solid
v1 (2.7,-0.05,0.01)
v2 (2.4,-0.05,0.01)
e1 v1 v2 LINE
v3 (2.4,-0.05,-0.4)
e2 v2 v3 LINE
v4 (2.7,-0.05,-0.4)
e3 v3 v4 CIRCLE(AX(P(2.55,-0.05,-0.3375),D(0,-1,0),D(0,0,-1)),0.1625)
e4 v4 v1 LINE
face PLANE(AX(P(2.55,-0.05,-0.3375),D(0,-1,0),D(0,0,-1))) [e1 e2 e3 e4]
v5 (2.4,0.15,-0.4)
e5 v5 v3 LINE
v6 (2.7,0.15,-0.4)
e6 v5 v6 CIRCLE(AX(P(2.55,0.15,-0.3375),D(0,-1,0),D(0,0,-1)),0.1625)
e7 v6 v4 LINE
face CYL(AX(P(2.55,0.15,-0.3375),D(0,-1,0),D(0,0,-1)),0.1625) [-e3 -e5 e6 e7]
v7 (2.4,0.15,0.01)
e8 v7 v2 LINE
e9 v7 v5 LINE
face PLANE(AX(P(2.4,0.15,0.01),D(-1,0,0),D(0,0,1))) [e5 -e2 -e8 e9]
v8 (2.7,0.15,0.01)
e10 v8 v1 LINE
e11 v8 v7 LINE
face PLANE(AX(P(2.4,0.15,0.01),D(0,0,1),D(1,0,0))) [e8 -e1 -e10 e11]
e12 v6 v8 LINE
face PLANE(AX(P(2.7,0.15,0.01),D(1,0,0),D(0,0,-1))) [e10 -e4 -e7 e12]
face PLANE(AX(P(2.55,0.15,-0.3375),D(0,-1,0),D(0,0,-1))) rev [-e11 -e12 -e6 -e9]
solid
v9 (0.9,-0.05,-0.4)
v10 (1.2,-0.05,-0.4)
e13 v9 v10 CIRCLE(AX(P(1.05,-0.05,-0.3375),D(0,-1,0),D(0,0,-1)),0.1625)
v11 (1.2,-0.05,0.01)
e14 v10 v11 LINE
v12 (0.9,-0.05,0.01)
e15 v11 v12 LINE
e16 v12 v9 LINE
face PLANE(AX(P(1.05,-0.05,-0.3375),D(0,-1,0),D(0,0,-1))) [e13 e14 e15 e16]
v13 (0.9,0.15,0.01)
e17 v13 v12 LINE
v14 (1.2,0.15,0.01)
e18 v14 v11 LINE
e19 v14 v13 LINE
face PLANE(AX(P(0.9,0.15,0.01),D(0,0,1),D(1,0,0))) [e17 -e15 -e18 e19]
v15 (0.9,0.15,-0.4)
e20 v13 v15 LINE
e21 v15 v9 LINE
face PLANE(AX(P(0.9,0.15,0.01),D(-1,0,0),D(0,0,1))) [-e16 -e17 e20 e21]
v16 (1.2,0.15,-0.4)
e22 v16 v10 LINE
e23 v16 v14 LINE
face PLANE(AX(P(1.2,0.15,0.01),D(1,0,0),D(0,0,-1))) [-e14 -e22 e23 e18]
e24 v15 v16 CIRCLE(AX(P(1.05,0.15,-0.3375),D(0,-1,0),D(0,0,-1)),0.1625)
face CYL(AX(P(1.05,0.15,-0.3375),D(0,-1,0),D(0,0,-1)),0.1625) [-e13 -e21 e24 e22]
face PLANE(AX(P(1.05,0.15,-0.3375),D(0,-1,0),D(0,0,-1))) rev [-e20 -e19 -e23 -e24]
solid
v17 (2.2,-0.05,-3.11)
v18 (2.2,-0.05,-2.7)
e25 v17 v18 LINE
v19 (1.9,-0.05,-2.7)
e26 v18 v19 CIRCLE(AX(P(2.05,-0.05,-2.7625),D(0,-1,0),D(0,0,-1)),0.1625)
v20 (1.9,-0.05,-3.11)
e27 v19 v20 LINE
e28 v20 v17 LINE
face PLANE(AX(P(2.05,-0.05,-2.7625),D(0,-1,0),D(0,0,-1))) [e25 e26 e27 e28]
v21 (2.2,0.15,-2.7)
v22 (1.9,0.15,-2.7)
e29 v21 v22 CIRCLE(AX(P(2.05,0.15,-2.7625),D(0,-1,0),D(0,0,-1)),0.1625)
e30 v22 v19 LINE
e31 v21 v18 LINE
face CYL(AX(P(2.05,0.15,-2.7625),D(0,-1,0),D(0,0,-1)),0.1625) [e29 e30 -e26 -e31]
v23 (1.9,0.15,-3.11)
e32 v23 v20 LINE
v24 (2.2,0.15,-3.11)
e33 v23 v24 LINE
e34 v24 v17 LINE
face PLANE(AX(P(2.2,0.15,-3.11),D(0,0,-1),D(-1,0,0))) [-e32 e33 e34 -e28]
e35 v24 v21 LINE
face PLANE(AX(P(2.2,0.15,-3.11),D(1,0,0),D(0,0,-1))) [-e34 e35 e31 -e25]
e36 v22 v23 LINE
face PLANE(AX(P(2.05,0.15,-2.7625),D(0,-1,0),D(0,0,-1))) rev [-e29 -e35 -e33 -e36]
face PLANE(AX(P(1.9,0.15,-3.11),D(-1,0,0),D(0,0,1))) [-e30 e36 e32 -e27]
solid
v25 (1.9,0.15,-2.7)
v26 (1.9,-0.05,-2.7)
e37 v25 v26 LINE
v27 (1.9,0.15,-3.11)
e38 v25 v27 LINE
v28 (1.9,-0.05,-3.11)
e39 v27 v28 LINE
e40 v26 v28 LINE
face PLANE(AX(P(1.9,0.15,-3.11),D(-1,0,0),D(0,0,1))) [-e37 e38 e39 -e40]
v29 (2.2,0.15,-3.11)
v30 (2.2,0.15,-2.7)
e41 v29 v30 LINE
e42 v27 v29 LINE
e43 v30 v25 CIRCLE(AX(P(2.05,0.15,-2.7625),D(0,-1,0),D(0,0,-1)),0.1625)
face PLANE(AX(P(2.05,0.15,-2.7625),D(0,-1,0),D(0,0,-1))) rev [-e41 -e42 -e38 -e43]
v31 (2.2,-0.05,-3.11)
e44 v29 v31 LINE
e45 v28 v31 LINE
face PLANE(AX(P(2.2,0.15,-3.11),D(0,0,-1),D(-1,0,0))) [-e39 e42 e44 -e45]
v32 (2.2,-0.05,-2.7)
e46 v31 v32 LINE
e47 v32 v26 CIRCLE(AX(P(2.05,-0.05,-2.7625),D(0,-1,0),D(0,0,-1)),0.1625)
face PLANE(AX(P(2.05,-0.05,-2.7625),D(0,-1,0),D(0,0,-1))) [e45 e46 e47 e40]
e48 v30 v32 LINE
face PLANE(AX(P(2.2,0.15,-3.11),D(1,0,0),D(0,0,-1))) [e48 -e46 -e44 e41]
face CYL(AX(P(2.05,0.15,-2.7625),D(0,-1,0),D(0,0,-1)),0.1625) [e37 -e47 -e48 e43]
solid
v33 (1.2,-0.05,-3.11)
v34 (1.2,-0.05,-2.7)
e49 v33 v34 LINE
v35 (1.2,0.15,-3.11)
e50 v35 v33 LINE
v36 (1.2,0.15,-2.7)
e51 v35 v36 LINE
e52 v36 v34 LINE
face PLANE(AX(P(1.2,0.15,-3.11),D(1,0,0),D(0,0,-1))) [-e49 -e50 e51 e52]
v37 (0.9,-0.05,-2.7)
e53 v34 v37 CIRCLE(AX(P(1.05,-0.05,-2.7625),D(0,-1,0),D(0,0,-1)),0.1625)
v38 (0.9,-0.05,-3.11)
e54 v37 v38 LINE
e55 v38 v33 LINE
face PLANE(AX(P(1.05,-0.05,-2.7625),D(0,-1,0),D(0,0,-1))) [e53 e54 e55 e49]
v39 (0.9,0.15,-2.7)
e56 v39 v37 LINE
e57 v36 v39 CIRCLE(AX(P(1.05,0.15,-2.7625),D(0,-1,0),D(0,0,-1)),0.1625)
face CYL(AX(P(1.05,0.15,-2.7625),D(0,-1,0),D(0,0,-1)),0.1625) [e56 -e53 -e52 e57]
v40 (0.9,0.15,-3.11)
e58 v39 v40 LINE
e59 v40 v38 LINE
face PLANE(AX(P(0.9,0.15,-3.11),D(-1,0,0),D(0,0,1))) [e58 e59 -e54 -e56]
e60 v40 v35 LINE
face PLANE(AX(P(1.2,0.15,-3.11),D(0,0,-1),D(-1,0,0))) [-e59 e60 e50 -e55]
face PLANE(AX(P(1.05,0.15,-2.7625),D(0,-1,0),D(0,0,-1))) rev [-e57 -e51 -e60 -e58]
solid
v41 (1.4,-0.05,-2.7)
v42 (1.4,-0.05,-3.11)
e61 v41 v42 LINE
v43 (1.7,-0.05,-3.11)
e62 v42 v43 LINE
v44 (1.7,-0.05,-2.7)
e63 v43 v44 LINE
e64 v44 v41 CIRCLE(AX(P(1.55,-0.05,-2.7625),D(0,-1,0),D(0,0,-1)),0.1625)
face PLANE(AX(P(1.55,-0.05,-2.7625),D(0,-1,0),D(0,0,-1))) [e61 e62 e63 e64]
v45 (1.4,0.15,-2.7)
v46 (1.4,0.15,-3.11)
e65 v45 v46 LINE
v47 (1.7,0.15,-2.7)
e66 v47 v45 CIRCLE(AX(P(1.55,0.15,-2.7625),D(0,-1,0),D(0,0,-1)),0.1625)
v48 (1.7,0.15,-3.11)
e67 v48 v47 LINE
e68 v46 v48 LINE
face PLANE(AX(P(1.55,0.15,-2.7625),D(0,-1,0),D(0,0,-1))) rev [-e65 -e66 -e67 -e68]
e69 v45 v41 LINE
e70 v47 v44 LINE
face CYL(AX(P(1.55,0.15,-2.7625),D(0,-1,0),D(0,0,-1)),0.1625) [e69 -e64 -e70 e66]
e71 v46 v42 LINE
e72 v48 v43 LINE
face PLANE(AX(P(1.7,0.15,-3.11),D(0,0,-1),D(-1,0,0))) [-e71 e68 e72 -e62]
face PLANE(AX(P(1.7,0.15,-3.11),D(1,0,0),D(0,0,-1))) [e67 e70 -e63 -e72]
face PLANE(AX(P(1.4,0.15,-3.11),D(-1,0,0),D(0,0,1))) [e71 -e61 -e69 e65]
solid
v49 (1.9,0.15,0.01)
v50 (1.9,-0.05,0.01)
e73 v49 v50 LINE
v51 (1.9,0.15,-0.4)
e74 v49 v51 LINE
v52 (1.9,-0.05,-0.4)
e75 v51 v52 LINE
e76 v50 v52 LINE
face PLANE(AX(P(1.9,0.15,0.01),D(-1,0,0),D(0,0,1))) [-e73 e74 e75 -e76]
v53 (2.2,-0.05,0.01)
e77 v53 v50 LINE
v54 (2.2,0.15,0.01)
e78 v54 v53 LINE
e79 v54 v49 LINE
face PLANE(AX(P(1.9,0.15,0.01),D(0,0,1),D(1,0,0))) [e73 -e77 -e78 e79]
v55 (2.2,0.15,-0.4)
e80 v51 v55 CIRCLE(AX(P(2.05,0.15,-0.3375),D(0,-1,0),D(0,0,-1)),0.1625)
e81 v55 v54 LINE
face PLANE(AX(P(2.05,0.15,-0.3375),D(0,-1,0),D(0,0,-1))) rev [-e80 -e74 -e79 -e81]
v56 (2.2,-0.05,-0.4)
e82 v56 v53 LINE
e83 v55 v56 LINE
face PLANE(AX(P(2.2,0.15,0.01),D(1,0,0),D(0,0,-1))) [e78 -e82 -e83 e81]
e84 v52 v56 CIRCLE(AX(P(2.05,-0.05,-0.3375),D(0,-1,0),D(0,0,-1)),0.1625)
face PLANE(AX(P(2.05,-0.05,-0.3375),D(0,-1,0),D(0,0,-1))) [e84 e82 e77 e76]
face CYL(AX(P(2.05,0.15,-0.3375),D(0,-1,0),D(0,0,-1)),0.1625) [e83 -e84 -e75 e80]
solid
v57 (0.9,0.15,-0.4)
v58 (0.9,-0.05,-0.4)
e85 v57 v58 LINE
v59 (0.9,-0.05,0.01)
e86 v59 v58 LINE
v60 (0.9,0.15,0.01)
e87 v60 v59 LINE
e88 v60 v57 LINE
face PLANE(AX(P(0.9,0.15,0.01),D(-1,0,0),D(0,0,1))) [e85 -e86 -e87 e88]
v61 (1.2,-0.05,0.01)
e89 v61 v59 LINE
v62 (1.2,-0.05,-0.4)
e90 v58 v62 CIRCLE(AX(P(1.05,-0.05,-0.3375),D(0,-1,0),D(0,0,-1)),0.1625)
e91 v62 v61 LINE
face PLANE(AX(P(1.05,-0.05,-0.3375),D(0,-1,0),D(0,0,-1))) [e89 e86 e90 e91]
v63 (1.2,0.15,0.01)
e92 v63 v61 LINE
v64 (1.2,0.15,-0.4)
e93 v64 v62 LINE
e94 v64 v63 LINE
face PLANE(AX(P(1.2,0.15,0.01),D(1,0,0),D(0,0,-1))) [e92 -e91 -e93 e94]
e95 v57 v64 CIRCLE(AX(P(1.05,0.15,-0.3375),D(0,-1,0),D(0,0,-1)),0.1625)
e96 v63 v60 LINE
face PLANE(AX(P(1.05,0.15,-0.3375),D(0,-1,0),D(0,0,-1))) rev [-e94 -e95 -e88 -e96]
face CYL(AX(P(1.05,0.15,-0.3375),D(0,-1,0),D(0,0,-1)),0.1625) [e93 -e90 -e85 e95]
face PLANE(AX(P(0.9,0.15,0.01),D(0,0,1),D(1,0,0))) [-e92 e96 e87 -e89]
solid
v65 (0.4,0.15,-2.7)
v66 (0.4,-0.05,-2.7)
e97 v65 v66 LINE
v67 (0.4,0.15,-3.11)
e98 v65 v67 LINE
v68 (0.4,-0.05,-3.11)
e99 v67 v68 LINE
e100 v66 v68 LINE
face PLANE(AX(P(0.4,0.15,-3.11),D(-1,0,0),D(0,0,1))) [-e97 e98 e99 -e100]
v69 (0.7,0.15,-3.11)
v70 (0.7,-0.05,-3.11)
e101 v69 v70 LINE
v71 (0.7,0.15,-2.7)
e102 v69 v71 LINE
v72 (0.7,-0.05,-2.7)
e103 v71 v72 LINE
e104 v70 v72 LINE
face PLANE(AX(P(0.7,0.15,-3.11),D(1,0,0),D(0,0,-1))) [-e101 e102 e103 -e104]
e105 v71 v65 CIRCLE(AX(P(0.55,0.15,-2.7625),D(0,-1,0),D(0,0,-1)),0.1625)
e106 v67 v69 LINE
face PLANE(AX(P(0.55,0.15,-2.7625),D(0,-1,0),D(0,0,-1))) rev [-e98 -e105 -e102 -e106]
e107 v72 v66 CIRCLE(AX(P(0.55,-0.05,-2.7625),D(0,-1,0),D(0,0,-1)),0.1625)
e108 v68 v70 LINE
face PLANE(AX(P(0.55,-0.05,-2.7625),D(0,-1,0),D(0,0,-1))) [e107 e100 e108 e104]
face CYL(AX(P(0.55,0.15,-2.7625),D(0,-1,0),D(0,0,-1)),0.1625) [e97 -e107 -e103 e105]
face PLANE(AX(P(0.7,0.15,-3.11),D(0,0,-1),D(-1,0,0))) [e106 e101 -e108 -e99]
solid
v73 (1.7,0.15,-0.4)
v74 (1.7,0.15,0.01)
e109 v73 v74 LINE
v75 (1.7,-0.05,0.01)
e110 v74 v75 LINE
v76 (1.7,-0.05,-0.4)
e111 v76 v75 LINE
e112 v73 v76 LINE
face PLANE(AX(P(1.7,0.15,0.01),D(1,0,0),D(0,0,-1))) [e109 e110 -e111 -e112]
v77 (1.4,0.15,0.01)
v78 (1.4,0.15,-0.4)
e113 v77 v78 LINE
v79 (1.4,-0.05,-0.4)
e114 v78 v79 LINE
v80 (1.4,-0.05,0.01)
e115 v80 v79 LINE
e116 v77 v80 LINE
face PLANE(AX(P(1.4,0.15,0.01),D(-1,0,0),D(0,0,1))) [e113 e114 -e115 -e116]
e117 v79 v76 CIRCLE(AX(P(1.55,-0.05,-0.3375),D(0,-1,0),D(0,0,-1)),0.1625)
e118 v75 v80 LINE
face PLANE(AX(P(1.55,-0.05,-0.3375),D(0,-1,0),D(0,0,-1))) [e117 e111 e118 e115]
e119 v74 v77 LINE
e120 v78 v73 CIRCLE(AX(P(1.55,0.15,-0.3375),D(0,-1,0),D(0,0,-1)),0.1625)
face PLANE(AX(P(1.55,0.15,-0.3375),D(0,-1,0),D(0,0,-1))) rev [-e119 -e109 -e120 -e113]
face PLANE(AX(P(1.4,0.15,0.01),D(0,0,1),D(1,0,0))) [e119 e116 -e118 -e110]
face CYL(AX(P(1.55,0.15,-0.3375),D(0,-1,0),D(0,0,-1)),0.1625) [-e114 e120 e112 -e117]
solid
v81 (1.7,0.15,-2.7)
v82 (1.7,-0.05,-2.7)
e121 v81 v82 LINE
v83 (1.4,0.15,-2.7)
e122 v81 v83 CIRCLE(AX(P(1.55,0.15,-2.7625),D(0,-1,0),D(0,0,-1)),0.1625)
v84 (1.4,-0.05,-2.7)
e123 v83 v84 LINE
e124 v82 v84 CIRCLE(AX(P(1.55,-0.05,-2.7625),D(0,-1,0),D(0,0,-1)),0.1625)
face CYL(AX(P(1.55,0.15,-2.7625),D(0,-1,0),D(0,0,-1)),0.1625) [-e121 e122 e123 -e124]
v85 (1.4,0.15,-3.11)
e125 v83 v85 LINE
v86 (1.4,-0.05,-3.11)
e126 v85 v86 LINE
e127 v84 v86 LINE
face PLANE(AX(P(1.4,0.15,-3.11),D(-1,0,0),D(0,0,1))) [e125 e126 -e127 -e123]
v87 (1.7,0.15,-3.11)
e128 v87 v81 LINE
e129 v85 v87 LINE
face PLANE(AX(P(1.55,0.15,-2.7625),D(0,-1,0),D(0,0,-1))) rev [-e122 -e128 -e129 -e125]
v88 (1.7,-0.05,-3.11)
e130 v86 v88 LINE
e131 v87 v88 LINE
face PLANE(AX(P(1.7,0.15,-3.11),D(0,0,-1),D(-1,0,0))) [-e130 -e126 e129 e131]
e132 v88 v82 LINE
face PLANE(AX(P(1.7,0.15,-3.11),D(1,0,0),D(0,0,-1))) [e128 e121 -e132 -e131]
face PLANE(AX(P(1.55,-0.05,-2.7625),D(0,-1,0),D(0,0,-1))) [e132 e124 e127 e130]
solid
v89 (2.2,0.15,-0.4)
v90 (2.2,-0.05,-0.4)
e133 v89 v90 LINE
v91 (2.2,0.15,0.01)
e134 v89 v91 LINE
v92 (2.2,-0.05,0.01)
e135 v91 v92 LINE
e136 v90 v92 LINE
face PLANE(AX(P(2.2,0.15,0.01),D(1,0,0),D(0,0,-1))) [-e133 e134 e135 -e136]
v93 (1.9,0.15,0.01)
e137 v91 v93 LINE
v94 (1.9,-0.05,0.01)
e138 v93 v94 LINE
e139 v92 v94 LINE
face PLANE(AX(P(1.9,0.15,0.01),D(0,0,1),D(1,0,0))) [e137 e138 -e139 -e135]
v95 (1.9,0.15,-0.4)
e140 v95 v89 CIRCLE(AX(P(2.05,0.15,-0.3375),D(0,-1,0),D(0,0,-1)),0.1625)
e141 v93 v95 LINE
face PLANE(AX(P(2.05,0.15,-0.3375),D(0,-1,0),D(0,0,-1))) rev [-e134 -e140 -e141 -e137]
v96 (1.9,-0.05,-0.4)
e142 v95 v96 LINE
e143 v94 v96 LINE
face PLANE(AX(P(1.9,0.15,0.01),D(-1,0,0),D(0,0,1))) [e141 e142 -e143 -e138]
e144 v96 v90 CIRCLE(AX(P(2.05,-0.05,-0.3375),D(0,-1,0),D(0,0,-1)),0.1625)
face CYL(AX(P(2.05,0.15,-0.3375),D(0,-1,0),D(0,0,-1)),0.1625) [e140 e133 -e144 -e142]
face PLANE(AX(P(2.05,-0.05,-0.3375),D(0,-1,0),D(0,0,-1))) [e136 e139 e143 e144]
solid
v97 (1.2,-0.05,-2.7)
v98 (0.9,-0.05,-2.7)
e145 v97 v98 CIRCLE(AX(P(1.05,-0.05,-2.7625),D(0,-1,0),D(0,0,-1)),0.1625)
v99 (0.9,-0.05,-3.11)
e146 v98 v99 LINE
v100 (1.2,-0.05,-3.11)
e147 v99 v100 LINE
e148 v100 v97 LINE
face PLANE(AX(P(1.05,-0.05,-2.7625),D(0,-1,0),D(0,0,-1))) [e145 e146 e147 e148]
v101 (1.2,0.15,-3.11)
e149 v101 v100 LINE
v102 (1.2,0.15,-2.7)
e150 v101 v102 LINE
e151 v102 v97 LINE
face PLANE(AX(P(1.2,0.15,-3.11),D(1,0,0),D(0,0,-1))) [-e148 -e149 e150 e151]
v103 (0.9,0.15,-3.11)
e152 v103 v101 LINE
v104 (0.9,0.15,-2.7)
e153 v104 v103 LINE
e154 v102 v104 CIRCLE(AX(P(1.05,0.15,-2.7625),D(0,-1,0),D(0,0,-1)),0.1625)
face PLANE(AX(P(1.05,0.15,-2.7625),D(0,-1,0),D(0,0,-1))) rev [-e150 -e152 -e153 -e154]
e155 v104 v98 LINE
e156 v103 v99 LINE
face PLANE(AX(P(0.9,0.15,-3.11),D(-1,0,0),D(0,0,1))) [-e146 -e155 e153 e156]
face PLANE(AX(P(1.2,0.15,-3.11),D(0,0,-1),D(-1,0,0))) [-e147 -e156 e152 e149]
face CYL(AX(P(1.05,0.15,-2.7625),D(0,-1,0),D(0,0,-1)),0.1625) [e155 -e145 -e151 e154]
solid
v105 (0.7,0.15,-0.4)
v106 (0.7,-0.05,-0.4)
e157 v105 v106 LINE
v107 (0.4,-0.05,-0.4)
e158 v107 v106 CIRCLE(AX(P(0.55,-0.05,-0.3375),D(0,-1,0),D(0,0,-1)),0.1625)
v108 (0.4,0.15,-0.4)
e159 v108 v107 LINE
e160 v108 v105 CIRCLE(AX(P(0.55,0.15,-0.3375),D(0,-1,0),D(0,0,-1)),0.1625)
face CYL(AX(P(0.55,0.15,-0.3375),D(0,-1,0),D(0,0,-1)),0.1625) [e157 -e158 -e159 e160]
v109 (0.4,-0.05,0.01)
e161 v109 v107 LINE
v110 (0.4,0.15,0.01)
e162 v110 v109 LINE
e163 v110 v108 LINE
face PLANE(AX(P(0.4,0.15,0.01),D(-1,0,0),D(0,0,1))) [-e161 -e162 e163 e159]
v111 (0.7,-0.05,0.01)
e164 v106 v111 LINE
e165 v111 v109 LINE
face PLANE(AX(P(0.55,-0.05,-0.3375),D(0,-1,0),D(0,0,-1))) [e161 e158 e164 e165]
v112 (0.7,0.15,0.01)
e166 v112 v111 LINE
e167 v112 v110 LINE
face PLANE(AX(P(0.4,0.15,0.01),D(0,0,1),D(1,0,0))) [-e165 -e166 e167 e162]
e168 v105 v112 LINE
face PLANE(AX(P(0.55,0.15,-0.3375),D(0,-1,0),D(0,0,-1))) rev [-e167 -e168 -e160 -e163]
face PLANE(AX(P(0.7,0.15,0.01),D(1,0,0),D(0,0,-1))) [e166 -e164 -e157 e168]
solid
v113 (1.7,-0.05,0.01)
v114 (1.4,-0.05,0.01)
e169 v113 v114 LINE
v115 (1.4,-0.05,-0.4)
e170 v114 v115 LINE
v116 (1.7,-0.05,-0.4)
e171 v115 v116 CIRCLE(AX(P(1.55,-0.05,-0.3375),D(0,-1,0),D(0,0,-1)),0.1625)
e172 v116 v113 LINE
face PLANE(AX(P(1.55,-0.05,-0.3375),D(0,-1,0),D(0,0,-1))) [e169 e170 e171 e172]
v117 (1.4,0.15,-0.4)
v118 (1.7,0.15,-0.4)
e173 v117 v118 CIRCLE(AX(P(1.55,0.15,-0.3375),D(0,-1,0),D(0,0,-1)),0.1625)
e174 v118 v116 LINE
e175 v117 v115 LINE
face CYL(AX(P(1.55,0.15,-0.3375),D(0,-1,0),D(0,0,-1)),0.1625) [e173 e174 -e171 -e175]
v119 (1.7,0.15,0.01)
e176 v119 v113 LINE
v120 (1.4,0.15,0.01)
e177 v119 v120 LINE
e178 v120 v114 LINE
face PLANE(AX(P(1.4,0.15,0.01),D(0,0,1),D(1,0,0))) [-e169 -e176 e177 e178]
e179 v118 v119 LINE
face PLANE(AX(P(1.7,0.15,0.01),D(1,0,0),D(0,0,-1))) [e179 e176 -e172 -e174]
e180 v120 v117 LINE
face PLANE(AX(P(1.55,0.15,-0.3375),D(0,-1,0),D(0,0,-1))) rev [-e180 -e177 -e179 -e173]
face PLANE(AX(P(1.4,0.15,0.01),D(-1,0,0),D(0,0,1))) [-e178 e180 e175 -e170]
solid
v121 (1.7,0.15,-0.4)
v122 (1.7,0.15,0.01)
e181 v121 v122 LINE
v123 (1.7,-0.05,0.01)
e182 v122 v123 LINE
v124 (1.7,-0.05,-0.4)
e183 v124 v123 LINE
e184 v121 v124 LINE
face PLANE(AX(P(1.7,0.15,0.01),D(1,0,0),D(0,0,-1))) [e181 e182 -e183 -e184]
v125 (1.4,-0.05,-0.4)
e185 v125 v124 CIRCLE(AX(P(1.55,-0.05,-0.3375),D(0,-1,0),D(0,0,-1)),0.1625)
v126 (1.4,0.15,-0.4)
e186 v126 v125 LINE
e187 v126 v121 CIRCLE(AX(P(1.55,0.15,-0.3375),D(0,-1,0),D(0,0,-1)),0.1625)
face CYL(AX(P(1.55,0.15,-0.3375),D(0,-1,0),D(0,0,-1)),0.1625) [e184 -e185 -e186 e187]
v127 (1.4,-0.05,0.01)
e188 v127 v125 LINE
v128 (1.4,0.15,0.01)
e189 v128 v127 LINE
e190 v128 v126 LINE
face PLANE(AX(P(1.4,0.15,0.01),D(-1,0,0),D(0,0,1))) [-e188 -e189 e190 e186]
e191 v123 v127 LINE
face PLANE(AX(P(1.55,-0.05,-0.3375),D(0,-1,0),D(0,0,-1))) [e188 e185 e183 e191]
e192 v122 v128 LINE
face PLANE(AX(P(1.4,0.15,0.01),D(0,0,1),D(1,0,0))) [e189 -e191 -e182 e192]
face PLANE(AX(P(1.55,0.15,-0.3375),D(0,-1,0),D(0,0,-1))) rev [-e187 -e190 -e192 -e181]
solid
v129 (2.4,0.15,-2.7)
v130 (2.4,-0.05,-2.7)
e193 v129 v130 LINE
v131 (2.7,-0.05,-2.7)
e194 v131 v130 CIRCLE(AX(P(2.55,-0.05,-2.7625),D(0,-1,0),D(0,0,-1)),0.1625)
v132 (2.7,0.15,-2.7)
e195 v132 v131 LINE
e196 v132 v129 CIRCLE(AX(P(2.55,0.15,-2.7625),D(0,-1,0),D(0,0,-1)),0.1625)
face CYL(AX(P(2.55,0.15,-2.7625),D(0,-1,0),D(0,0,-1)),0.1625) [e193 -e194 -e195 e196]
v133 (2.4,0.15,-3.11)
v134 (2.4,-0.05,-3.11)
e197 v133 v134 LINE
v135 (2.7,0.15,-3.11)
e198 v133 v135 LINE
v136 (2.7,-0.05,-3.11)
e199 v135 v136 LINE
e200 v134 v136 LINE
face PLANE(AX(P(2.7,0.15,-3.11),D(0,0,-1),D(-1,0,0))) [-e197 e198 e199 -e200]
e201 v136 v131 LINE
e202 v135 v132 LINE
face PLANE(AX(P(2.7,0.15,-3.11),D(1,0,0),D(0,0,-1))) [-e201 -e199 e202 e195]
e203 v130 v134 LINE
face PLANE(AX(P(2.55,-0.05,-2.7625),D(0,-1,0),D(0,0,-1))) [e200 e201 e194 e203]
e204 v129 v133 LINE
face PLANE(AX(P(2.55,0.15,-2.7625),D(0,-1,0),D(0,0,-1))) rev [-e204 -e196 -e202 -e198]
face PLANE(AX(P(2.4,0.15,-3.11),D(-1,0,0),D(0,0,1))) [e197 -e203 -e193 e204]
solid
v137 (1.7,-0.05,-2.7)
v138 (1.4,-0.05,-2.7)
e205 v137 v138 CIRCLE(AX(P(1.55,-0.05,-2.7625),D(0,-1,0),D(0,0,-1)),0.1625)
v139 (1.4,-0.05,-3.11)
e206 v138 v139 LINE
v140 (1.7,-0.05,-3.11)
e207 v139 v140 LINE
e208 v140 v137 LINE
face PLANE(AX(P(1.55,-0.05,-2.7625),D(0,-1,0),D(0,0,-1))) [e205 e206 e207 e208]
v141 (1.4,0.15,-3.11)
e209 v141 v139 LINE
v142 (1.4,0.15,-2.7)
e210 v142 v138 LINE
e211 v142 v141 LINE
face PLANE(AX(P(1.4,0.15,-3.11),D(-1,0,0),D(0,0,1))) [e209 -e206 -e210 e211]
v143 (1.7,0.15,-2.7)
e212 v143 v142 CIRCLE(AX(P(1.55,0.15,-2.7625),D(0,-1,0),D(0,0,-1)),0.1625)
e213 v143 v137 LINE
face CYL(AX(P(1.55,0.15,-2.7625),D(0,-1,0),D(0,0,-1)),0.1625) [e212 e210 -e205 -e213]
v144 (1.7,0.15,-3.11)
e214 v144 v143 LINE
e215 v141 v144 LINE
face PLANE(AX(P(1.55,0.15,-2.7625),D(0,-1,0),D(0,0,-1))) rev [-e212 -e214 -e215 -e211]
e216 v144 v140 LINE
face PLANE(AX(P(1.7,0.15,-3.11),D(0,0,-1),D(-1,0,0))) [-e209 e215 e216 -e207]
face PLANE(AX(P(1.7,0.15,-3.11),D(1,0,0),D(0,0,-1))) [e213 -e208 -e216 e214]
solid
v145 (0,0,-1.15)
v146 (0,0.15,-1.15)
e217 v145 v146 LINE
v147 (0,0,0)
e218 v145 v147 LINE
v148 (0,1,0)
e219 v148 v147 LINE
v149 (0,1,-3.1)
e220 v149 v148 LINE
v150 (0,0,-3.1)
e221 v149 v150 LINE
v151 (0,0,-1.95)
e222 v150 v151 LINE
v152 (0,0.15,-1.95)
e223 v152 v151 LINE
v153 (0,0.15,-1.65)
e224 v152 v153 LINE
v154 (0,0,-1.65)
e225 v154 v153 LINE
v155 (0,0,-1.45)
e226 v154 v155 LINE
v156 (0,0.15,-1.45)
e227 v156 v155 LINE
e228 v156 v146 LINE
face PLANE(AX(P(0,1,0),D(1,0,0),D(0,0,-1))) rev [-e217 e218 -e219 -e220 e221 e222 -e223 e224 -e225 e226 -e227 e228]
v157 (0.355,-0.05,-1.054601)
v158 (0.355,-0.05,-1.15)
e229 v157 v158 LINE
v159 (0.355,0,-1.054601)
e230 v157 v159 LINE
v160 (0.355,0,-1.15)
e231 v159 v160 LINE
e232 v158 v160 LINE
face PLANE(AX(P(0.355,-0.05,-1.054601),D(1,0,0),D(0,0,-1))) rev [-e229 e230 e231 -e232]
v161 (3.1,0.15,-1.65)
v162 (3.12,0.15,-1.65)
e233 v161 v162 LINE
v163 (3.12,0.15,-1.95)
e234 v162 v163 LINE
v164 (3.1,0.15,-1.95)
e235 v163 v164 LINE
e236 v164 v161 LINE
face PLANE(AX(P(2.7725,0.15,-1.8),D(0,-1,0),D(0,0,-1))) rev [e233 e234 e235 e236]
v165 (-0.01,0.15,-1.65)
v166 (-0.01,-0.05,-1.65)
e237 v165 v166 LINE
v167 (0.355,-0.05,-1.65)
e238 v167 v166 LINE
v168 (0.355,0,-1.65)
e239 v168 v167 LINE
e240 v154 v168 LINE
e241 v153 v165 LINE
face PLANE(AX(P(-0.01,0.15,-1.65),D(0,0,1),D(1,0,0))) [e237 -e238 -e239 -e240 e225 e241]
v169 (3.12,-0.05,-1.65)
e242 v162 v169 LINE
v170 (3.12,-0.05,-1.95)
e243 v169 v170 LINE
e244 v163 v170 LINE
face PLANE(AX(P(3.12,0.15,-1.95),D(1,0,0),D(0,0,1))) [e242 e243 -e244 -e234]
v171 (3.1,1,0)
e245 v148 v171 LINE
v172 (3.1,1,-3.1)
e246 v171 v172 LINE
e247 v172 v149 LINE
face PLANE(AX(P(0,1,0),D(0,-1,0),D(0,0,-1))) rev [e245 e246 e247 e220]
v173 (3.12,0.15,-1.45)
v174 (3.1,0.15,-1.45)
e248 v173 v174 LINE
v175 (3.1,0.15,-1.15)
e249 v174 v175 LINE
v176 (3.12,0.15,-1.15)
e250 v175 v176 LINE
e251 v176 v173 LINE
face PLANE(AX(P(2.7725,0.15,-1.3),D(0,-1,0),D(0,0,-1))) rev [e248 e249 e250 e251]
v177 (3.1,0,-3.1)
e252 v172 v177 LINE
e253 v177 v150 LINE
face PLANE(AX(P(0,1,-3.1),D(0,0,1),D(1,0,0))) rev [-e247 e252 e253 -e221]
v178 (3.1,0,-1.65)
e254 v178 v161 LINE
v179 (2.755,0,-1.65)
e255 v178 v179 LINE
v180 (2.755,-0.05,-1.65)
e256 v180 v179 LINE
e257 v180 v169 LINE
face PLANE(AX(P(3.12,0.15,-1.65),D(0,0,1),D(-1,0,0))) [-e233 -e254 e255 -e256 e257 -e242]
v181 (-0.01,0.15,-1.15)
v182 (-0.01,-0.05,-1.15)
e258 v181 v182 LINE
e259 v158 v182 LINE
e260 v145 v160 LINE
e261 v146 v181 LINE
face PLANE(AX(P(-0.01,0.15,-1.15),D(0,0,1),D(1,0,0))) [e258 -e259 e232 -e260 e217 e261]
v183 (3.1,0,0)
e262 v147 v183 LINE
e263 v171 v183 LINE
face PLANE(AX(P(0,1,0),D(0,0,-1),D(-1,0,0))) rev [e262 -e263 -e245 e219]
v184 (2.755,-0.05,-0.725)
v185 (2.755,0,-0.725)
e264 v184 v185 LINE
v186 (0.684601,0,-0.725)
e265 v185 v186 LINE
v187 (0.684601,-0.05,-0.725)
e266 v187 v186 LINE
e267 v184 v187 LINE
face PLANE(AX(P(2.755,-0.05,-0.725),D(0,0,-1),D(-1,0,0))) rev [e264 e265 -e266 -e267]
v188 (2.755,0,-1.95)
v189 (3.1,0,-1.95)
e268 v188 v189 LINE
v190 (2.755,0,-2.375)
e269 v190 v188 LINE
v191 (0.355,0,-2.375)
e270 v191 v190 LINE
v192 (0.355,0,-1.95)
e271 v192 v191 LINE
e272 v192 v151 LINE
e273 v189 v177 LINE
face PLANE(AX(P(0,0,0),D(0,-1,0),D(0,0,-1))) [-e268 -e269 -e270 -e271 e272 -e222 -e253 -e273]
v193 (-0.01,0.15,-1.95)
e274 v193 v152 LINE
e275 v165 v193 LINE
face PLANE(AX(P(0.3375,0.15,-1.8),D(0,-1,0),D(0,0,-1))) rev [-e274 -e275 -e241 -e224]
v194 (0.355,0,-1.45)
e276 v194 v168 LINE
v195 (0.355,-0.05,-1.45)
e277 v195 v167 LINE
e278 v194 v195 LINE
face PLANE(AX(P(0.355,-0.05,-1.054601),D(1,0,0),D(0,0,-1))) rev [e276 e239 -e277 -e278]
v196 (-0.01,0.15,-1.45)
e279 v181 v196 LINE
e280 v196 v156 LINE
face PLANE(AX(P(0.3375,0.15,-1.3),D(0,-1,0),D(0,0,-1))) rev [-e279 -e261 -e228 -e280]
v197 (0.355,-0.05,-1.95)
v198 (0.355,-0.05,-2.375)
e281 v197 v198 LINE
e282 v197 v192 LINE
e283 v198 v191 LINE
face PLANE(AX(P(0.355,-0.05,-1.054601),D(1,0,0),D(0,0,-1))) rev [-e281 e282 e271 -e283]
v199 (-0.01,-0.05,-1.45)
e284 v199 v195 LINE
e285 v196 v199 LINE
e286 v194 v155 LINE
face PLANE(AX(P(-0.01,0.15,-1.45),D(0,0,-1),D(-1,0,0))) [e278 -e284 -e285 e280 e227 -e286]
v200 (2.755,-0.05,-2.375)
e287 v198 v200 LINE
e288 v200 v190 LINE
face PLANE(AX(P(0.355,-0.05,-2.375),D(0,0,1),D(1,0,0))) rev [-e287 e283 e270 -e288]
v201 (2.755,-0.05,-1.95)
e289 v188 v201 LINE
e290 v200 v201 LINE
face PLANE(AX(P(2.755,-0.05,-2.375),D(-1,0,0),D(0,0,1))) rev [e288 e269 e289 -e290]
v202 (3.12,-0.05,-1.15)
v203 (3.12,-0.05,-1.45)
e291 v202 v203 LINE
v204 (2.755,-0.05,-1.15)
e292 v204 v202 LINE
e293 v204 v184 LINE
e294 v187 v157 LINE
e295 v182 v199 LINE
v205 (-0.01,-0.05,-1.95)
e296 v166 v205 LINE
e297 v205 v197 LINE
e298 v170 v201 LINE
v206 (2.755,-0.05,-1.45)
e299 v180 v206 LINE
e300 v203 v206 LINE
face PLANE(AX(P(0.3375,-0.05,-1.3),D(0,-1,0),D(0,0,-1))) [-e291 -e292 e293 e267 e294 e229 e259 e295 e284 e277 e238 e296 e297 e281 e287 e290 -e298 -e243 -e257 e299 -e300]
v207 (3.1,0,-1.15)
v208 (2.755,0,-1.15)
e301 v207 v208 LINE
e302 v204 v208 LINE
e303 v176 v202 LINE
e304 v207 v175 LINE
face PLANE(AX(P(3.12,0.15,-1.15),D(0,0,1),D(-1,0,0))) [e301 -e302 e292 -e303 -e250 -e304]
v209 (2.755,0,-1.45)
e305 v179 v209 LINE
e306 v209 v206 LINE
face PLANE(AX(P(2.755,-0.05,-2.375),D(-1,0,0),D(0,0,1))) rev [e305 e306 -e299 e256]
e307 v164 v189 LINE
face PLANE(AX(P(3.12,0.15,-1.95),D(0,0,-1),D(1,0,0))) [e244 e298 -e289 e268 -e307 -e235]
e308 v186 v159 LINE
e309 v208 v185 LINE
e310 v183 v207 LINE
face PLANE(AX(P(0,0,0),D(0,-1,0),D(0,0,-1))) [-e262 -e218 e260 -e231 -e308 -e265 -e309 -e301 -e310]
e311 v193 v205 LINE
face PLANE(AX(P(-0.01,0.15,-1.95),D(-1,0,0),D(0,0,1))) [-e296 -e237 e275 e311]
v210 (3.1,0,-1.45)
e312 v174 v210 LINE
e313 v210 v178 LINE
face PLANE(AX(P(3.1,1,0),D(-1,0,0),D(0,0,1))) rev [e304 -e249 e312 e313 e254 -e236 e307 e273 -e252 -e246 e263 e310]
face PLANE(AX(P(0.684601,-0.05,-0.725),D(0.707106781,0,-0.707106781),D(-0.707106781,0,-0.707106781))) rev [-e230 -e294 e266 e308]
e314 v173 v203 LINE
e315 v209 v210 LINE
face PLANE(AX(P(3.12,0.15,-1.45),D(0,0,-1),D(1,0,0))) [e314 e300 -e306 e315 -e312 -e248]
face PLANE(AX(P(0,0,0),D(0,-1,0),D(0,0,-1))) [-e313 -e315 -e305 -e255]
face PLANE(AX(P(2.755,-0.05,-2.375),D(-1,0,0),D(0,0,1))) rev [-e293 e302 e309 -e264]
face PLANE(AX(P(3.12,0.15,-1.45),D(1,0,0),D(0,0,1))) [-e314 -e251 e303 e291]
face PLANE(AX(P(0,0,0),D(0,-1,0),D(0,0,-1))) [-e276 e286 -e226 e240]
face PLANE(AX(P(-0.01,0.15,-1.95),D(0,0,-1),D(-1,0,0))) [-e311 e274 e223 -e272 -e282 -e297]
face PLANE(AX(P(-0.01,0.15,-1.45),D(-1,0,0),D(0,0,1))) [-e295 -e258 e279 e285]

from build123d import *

# Parameters (mm, degrees)
SKETCH1_W            = 3.1
SKETCH1_H            = 3.1
BOSS_EXTRUDE1_DEPTH  = 1
BOSS_EXTRUDE2_START  = 0.05
BOSS_EXTRUDE2_DEPTH  = 0.2
BOSS_EXTRUDE3_START  = 0.05
BOSS_EXTRUDE3_DEPTH  = 0.2
BOSS_EXTRUDE4_START  = 0.05
BOSS_EXTRUDE4_DEPTH  = 0.2
LPATTERN3_COUNT      = 2
LPATTERN3_PITCH      = 0.5
MIRROR7_START        = 0.05
MIRROR7_COPY_1_DEPTH = 0.2
LPATTERN4_START      = -0.05
LPATTERN4_DEPTH      = 0.2
LPATTERN4_2_DEPTH    = 0.2
LPATTERN4_3_DEPTH    = 0.2
LPATTERN4_4_DEPTH    = 0.2
LPATTERN4_5_DEPTH    = 0.2
LPATTERN4_6_DEPTH    = 0.2
LPATTERN4_7_DEPTH    = 0.2
LPATTERN4_8_DEPTH    = 0.2
LPATTERN5_START      = -0.05
LPATTERN5_DEPTH      = 0.2
LPATTERN5_2_DEPTH    = 0.2
LPATTERN5_3_DEPTH    = 0.2
LPATTERN5_4_DEPTH    = 0.2
LPATTERN5_5_DEPTH    = 0.2
LPATTERN5_6_DEPTH    = 0.2
LPATTERN5_7_DEPTH    = 0.2
LPATTERN5_8_DEPTH    = 0.2
BOSS_EXTRUDE5_DEPTH  = 0.05


# Read off the part's stored shape, not the designer's step: LPattern4, LPattern5
with BuildPart() as part:
    # Sketch1 → Boss-Extrude1 (new body)
    with BuildSketch(Plane(origin=(0, 0, 0), x_dir=(1, 0, 0), z_dir=(0, 1, 0))):
        with Locations((1.55, 1.55)):
            Rectangle(SKETCH1_W, SKETCH1_H)
    extrude(amount=BOSS_EXTRUDE1_DEPTH)


with BuildPart() as body_2:
    # Sketch2 → Boss-Extrude2 (new body)
    with BuildSketch(Plane.XZ.offset(BOSS_EXTRUDE2_START)):
        with BuildLine():
            Line((1.7, 0.01), (1.7, -0.4))
            ThreePointArc((1.7, -0.4), (1.55, -0.5), (1.4, -0.4))
            Line((1.4, -0.4), (1.4, 0.01))
            Line((1.4, 0.01), (1.7, 0.01))
        make_face()
    extrude(amount=-BOSS_EXTRUDE2_DEPTH)


with BuildPart() as body_3:
    # Sketch4 → Boss-Extrude3 (new body)
    with BuildSketch(Plane.XZ.offset(BOSS_EXTRUDE3_START)):
        with BuildLine():
            Line((1.4, -3.11), (1.4, -2.7))
            ThreePointArc((1.4, -2.7), (1.55, -2.6), (1.7, -2.7))
            Line((1.7, -2.7), (1.7, -3.11))
            Line((1.7, -3.11), (1.4, -3.11))
        make_face()
    extrude(amount=-BOSS_EXTRUDE3_DEPTH)


with BuildPart() as body_4:
    # Sketch5 → Boss-Extrude4 (new body)
    with BuildSketch(Plane.XZ.offset(BOSS_EXTRUDE4_START)):
        with BuildLine():
            Line((-0.01, -1.15), (0.4, -1.15))
            ThreePointArc((0.4, -1.15), (0.5, -1.3), (0.4, -1.45))
            Line((0.4, -1.45), (-0.01, -1.45))
            Line((-0.01, -1.45), (-0.01, -1.15))
        make_face()
    boss_extrude4 = extrude(amount=-BOSS_EXTRUDE4_DEPTH)


with BuildPart() as lpattern3_1:
    # LPattern3: Boss-Extrude4 ×2
    with Locations(*[(0, 0, -i * LPATTERN3_PITCH) for i in range(1, LPATTERN3_COUNT)]):
        add(boss_extrude4)


with BuildPart() as part_1:
    add(part.part)

    # Mirror7: Boss-Extrude4 across plane
    add(boss_extrude4.mirror(Plane(origin=(1.555, 0, 0), x_dir=(0, 0, 1), z_dir=(1, 0, 0))))

    # Mirror7 copy 1 sketch → Mirror7 copy 1 (add)
    with BuildSketch(Plane(origin=(3.11, 0, -0.5), x_dir=(-1, 0, 0), z_dir=(0, -1, 0)).offset(MIRROR7_START)):
        with BuildLine():
            Line((-0.01, 1.15), (0.4, 1.15))
            ThreePointArc((0.4, 1.15), (0.5, 1.3), (0.4, 1.45))
            Line((0.4, 1.45), (-0.01, 1.45))
            Line((-0.01, 1.45), (-0.01, 1.15))
        make_face()
    extrude(amount=-MIRROR7_COPY_1_DEPTH)

    add(body_4.part)  # Boss-Extrude5 merges body 4

    add(lpattern3_1.part)  # Boss-Extrude5 merges LPattern3_1
    # Sketch6 → Boss-Extrude5 (add)
    with BuildSketch(Plane.XZ):
        Polygon((0.684601229, -0.725), (0.355, -1.054601229), (0.355, -2.375), (2.755, -2.375), (2.755, -0.725), (1.555, -0.725), align=None)
    extrude(amount=BOSS_EXTRUDE5_DEPTH)


with BuildPart() as body_6:
    # LPattern4 outline → LPattern4 (new body)
    with BuildSketch(Plane(origin=(0, 0, 0), x_dir=(1, 0, 0), z_dir=(0, 1, 0)).offset(LPATTERN4_START)):
        with BuildLine():
            ThreePointArc((2.2, 0.4), (2.05, 0.5), (1.9, 0.4))
            Line((1.9, 0.4), (1.9, -0.01))
            Line((1.9, -0.01), (2.2, -0.01))
            Line((2.2, -0.01), (2.2, 0.4))
        make_face()
    extrude(amount=LPATTERN4_DEPTH)


with BuildPart() as body_7:
    # LPattern4 2 outline → LPattern4 2 (new body)
    with BuildSketch(Plane(origin=(0, 0, 0), x_dir=(1, 0, 0), z_dir=(0, 1, 0)).offset(LPATTERN4_START)):
        with BuildLine():
            ThreePointArc((2.7, 0.4), (2.55, 0.5), (2.4, 0.4))
            Line((2.4, 0.4), (2.4, -0.01))
            Line((2.4, -0.01), (2.7, -0.01))
            Line((2.7, -0.01), (2.7, 0.4))
        make_face()
    extrude(amount=LPATTERN4_2_DEPTH)


with BuildPart() as body_8:
    # LPattern4 3 outline → LPattern4 3 (new body)
    with BuildSketch(Plane(origin=(0, 0, 0), x_dir=(1, 0, 0), z_dir=(0, 1, 0)).offset(LPATTERN4_START)):
        with BuildLine():
            ThreePointArc((1.2, 0.4), (1.05, 0.5), (0.9, 0.4))
            Line((0.9, 0.4), (0.9, -0.01))
            Line((0.9, -0.01), (1.2, -0.01))
            Line((1.2, -0.01), (1.2, 0.4))
        make_face()
    extrude(amount=LPATTERN4_3_DEPTH)


with BuildPart() as body_9:
    # LPattern4 4 outline → LPattern4 4 (new body)
    with BuildSketch(Plane(origin=(0, 0, 0), x_dir=(1, 0, 0), z_dir=(0, 1, 0)).offset(LPATTERN4_START)):
        with BuildLine():
            ThreePointArc((1.7, 0.4), (1.55, 0.5), (1.4, 0.4))
            Line((1.4, 0.4), (1.4, -0.01))
            Line((1.4, -0.01), (1.7, -0.01))
            Line((1.7, -0.01), (1.7, 0.4))
        make_face()
    extrude(amount=LPATTERN4_4_DEPTH)


with BuildPart() as body_10:
    # LPattern4 5 outline → LPattern4 5 (new body)
    with BuildSketch(Plane(origin=(0, 0, 0), x_dir=(1, 0, 0), z_dir=(0, 1, 0)).offset(LPATTERN4_START)):
        with BuildLine():
            ThreePointArc((2.2, 0.4), (2.05, 0.5), (1.9, 0.4))
            Line((1.9, 0.4), (1.9, -0.01))
            Line((1.9, -0.01), (2.2, -0.01))
            Line((2.2, -0.01), (2.2, 0.4))
        make_face()
    extrude(amount=LPATTERN4_5_DEPTH)


with BuildPart() as body_11:
    # LPattern4 6 outline → LPattern4 6 (new body)
    with BuildSketch(Plane(origin=(0, 0, 0), x_dir=(1, 0, 0), z_dir=(0, 1, 0)).offset(LPATTERN4_START)):
        with BuildLine():
            ThreePointArc((0.7, 0.4), (0.55, 0.5), (0.4, 0.4))
            Line((0.4, 0.4), (0.4, -0.01))
            Line((0.4, -0.01), (0.7, -0.01))
            Line((0.7, -0.01), (0.7, 0.4))
        make_face()
    extrude(amount=LPATTERN4_6_DEPTH)


with BuildPart() as body_12:
    # LPattern4 7 outline → LPattern4 7 (new body)
    with BuildSketch(Plane(origin=(0, 0, 0), x_dir=(1, 0, 0), z_dir=(0, 1, 0)).offset(LPATTERN4_START)):
        with BuildLine():
            ThreePointArc((1.2, 0.4), (1.05, 0.5), (0.9, 0.4))
            Line((0.9, 0.4), (0.9, -0.01))
            Line((0.9, -0.01), (1.2, -0.01))
            Line((1.2, -0.01), (1.2, 0.4))
        make_face()
    extrude(amount=LPATTERN4_7_DEPTH)


with BuildPart() as body_13:
    # LPattern4 8 outline → LPattern4 8 (new body)
    with BuildSketch(Plane(origin=(0, 0, 0), x_dir=(1, 0, 0), z_dir=(0, 1, 0)).offset(LPATTERN4_START)):
        with BuildLine():
            ThreePointArc((1.7, 0.4), (1.55, 0.5), (1.4, 0.4))
            Line((1.4, 0.4), (1.4, -0.01))
            Line((1.4, -0.01), (1.7, -0.01))
            Line((1.7, -0.01), (1.7, 0.4))
        make_face()
    extrude(amount=LPATTERN4_8_DEPTH)


with BuildPart() as body_14:
    # LPattern5 outline → LPattern5 (new body)
    with BuildSketch(Plane(origin=(0, 0, 0), x_dir=(1, 0, 0), z_dir=(0, 1, 0)).offset(LPATTERN5_START)):
        with BuildLine():
            ThreePointArc((1.9, 2.7), (2.05, 2.6), (2.2, 2.7))
            Line((2.2, 2.7), (2.2, 3.11))
            Line((2.2, 3.11), (1.9, 3.11))
            Line((1.9, 3.11), (1.9, 2.7))
        make_face()
    extrude(amount=LPATTERN5_DEPTH)


with BuildPart() as body_15:
    # LPattern5 2 outline → LPattern5 2 (new body)
    with BuildSketch(Plane(origin=(0, 0, 0), x_dir=(1, 0, 0), z_dir=(0, 1, 0)).offset(LPATTERN5_START)):
        with BuildLine():
            ThreePointArc((2.4, 2.7), (2.55, 2.6), (2.7, 2.7))
            Line((2.7, 2.7), (2.7, 3.11))
            Line((2.7, 3.11), (2.4, 3.11))
            Line((2.4, 3.11), (2.4, 2.7))
        make_face()
    extrude(amount=LPATTERN5_2_DEPTH)


with BuildPart() as body_16:
    # LPattern5 3 outline → LPattern5 3 (new body)
    with BuildSketch(Plane(origin=(0, 0, 0), x_dir=(1, 0, 0), z_dir=(0, 1, 0)).offset(LPATTERN5_START)):
        with BuildLine():
            ThreePointArc((0.9, 2.7), (1.05, 2.6), (1.2, 2.7))
            Line((1.2, 2.7), (1.2, 3.11))
            Line((1.2, 3.11), (0.9, 3.11))
            Line((0.9, 3.11), (0.9, 2.7))
        make_face()
    extrude(amount=LPATTERN5_3_DEPTH)


with BuildPart() as body_17:
    # LPattern5 4 outline → LPattern5 4 (new body)
    with BuildSketch(Plane(origin=(0, 0, 0), x_dir=(1, 0, 0), z_dir=(0, 1, 0)).offset(LPATTERN5_START)):
        with BuildLine():
            ThreePointArc((1.4, 2.7), (1.55, 2.6), (1.7, 2.7))
            Line((1.7, 2.7), (1.7, 3.11))
            Line((1.7, 3.11), (1.4, 3.11))
            Line((1.4, 3.11), (1.4, 2.7))
        make_face()
    extrude(amount=LPATTERN5_4_DEPTH)


with BuildPart() as body_18:
    # LPattern5 5 outline → LPattern5 5 (new body)
    with BuildSketch(Plane(origin=(0, 0, 0), x_dir=(1, 0, 0), z_dir=(0, 1, 0)).offset(LPATTERN5_START)):
        with BuildLine():
            ThreePointArc((1.9, 2.7), (2.05, 2.6), (2.2, 2.7))
            Line((2.2, 2.7), (2.2, 3.11))
            Line((2.2, 3.11), (1.9, 3.11))
            Line((1.9, 3.11), (1.9, 2.7))
        make_face()
    extrude(amount=LPATTERN5_5_DEPTH)


with BuildPart() as body_19:
    # LPattern5 6 outline → LPattern5 6 (new body)
    with BuildSketch(Plane(origin=(0, 0, 0), x_dir=(1, 0, 0), z_dir=(0, 1, 0)).offset(LPATTERN5_START)):
        with BuildLine():
            ThreePointArc((0.4, 2.7), (0.55, 2.6), (0.7, 2.7))
            Line((0.7, 2.7), (0.7, 3.11))
            Line((0.7, 3.11), (0.4, 3.11))
            Line((0.4, 3.11), (0.4, 2.7))
        make_face()
    extrude(amount=LPATTERN5_6_DEPTH)


with BuildPart() as body_20:
    # LPattern5 7 outline → LPattern5 7 (new body)
    with BuildSketch(Plane(origin=(0, 0, 0), x_dir=(1, 0, 0), z_dir=(0, 1, 0)).offset(LPATTERN5_START)):
        with BuildLine():
            ThreePointArc((0.9, 2.7), (1.05, 2.6), (1.2, 2.7))
            Line((1.2, 2.7), (1.2, 3.11))
            Line((1.2, 3.11), (0.9, 3.11))
            Line((0.9, 3.11), (0.9, 2.7))
        make_face()
    extrude(amount=LPATTERN5_7_DEPTH)


with BuildPart() as body_21:
    # LPattern5 8 outline → LPattern5 8 (new body)
    with BuildSketch(Plane(origin=(0, 0, 0), x_dir=(1, 0, 0), z_dir=(0, 1, 0)).offset(LPATTERN5_START)):
        with BuildLine():
            ThreePointArc((1.4, 2.7), (1.55, 2.6), (1.7, 2.7))
            Line((1.7, 2.7), (1.7, 3.11))
            Line((1.7, 3.11), (1.4, 3.11))
            Line((1.4, 3.11), (1.4, 2.7))
        make_face()
    extrude(amount=LPATTERN5_8_DEPTH)


solid = Compound([body_2.part, body_3.part, part_1.part, body_6.part, body_7.part, body_8.part, body_9.part, body_10.part, body_11.part, body_12.part, body_13.part, body_14.part, body_15.part, body_16.part, body_17.part, body_18.part, body_19.part, body_20.part, body_21.part])
